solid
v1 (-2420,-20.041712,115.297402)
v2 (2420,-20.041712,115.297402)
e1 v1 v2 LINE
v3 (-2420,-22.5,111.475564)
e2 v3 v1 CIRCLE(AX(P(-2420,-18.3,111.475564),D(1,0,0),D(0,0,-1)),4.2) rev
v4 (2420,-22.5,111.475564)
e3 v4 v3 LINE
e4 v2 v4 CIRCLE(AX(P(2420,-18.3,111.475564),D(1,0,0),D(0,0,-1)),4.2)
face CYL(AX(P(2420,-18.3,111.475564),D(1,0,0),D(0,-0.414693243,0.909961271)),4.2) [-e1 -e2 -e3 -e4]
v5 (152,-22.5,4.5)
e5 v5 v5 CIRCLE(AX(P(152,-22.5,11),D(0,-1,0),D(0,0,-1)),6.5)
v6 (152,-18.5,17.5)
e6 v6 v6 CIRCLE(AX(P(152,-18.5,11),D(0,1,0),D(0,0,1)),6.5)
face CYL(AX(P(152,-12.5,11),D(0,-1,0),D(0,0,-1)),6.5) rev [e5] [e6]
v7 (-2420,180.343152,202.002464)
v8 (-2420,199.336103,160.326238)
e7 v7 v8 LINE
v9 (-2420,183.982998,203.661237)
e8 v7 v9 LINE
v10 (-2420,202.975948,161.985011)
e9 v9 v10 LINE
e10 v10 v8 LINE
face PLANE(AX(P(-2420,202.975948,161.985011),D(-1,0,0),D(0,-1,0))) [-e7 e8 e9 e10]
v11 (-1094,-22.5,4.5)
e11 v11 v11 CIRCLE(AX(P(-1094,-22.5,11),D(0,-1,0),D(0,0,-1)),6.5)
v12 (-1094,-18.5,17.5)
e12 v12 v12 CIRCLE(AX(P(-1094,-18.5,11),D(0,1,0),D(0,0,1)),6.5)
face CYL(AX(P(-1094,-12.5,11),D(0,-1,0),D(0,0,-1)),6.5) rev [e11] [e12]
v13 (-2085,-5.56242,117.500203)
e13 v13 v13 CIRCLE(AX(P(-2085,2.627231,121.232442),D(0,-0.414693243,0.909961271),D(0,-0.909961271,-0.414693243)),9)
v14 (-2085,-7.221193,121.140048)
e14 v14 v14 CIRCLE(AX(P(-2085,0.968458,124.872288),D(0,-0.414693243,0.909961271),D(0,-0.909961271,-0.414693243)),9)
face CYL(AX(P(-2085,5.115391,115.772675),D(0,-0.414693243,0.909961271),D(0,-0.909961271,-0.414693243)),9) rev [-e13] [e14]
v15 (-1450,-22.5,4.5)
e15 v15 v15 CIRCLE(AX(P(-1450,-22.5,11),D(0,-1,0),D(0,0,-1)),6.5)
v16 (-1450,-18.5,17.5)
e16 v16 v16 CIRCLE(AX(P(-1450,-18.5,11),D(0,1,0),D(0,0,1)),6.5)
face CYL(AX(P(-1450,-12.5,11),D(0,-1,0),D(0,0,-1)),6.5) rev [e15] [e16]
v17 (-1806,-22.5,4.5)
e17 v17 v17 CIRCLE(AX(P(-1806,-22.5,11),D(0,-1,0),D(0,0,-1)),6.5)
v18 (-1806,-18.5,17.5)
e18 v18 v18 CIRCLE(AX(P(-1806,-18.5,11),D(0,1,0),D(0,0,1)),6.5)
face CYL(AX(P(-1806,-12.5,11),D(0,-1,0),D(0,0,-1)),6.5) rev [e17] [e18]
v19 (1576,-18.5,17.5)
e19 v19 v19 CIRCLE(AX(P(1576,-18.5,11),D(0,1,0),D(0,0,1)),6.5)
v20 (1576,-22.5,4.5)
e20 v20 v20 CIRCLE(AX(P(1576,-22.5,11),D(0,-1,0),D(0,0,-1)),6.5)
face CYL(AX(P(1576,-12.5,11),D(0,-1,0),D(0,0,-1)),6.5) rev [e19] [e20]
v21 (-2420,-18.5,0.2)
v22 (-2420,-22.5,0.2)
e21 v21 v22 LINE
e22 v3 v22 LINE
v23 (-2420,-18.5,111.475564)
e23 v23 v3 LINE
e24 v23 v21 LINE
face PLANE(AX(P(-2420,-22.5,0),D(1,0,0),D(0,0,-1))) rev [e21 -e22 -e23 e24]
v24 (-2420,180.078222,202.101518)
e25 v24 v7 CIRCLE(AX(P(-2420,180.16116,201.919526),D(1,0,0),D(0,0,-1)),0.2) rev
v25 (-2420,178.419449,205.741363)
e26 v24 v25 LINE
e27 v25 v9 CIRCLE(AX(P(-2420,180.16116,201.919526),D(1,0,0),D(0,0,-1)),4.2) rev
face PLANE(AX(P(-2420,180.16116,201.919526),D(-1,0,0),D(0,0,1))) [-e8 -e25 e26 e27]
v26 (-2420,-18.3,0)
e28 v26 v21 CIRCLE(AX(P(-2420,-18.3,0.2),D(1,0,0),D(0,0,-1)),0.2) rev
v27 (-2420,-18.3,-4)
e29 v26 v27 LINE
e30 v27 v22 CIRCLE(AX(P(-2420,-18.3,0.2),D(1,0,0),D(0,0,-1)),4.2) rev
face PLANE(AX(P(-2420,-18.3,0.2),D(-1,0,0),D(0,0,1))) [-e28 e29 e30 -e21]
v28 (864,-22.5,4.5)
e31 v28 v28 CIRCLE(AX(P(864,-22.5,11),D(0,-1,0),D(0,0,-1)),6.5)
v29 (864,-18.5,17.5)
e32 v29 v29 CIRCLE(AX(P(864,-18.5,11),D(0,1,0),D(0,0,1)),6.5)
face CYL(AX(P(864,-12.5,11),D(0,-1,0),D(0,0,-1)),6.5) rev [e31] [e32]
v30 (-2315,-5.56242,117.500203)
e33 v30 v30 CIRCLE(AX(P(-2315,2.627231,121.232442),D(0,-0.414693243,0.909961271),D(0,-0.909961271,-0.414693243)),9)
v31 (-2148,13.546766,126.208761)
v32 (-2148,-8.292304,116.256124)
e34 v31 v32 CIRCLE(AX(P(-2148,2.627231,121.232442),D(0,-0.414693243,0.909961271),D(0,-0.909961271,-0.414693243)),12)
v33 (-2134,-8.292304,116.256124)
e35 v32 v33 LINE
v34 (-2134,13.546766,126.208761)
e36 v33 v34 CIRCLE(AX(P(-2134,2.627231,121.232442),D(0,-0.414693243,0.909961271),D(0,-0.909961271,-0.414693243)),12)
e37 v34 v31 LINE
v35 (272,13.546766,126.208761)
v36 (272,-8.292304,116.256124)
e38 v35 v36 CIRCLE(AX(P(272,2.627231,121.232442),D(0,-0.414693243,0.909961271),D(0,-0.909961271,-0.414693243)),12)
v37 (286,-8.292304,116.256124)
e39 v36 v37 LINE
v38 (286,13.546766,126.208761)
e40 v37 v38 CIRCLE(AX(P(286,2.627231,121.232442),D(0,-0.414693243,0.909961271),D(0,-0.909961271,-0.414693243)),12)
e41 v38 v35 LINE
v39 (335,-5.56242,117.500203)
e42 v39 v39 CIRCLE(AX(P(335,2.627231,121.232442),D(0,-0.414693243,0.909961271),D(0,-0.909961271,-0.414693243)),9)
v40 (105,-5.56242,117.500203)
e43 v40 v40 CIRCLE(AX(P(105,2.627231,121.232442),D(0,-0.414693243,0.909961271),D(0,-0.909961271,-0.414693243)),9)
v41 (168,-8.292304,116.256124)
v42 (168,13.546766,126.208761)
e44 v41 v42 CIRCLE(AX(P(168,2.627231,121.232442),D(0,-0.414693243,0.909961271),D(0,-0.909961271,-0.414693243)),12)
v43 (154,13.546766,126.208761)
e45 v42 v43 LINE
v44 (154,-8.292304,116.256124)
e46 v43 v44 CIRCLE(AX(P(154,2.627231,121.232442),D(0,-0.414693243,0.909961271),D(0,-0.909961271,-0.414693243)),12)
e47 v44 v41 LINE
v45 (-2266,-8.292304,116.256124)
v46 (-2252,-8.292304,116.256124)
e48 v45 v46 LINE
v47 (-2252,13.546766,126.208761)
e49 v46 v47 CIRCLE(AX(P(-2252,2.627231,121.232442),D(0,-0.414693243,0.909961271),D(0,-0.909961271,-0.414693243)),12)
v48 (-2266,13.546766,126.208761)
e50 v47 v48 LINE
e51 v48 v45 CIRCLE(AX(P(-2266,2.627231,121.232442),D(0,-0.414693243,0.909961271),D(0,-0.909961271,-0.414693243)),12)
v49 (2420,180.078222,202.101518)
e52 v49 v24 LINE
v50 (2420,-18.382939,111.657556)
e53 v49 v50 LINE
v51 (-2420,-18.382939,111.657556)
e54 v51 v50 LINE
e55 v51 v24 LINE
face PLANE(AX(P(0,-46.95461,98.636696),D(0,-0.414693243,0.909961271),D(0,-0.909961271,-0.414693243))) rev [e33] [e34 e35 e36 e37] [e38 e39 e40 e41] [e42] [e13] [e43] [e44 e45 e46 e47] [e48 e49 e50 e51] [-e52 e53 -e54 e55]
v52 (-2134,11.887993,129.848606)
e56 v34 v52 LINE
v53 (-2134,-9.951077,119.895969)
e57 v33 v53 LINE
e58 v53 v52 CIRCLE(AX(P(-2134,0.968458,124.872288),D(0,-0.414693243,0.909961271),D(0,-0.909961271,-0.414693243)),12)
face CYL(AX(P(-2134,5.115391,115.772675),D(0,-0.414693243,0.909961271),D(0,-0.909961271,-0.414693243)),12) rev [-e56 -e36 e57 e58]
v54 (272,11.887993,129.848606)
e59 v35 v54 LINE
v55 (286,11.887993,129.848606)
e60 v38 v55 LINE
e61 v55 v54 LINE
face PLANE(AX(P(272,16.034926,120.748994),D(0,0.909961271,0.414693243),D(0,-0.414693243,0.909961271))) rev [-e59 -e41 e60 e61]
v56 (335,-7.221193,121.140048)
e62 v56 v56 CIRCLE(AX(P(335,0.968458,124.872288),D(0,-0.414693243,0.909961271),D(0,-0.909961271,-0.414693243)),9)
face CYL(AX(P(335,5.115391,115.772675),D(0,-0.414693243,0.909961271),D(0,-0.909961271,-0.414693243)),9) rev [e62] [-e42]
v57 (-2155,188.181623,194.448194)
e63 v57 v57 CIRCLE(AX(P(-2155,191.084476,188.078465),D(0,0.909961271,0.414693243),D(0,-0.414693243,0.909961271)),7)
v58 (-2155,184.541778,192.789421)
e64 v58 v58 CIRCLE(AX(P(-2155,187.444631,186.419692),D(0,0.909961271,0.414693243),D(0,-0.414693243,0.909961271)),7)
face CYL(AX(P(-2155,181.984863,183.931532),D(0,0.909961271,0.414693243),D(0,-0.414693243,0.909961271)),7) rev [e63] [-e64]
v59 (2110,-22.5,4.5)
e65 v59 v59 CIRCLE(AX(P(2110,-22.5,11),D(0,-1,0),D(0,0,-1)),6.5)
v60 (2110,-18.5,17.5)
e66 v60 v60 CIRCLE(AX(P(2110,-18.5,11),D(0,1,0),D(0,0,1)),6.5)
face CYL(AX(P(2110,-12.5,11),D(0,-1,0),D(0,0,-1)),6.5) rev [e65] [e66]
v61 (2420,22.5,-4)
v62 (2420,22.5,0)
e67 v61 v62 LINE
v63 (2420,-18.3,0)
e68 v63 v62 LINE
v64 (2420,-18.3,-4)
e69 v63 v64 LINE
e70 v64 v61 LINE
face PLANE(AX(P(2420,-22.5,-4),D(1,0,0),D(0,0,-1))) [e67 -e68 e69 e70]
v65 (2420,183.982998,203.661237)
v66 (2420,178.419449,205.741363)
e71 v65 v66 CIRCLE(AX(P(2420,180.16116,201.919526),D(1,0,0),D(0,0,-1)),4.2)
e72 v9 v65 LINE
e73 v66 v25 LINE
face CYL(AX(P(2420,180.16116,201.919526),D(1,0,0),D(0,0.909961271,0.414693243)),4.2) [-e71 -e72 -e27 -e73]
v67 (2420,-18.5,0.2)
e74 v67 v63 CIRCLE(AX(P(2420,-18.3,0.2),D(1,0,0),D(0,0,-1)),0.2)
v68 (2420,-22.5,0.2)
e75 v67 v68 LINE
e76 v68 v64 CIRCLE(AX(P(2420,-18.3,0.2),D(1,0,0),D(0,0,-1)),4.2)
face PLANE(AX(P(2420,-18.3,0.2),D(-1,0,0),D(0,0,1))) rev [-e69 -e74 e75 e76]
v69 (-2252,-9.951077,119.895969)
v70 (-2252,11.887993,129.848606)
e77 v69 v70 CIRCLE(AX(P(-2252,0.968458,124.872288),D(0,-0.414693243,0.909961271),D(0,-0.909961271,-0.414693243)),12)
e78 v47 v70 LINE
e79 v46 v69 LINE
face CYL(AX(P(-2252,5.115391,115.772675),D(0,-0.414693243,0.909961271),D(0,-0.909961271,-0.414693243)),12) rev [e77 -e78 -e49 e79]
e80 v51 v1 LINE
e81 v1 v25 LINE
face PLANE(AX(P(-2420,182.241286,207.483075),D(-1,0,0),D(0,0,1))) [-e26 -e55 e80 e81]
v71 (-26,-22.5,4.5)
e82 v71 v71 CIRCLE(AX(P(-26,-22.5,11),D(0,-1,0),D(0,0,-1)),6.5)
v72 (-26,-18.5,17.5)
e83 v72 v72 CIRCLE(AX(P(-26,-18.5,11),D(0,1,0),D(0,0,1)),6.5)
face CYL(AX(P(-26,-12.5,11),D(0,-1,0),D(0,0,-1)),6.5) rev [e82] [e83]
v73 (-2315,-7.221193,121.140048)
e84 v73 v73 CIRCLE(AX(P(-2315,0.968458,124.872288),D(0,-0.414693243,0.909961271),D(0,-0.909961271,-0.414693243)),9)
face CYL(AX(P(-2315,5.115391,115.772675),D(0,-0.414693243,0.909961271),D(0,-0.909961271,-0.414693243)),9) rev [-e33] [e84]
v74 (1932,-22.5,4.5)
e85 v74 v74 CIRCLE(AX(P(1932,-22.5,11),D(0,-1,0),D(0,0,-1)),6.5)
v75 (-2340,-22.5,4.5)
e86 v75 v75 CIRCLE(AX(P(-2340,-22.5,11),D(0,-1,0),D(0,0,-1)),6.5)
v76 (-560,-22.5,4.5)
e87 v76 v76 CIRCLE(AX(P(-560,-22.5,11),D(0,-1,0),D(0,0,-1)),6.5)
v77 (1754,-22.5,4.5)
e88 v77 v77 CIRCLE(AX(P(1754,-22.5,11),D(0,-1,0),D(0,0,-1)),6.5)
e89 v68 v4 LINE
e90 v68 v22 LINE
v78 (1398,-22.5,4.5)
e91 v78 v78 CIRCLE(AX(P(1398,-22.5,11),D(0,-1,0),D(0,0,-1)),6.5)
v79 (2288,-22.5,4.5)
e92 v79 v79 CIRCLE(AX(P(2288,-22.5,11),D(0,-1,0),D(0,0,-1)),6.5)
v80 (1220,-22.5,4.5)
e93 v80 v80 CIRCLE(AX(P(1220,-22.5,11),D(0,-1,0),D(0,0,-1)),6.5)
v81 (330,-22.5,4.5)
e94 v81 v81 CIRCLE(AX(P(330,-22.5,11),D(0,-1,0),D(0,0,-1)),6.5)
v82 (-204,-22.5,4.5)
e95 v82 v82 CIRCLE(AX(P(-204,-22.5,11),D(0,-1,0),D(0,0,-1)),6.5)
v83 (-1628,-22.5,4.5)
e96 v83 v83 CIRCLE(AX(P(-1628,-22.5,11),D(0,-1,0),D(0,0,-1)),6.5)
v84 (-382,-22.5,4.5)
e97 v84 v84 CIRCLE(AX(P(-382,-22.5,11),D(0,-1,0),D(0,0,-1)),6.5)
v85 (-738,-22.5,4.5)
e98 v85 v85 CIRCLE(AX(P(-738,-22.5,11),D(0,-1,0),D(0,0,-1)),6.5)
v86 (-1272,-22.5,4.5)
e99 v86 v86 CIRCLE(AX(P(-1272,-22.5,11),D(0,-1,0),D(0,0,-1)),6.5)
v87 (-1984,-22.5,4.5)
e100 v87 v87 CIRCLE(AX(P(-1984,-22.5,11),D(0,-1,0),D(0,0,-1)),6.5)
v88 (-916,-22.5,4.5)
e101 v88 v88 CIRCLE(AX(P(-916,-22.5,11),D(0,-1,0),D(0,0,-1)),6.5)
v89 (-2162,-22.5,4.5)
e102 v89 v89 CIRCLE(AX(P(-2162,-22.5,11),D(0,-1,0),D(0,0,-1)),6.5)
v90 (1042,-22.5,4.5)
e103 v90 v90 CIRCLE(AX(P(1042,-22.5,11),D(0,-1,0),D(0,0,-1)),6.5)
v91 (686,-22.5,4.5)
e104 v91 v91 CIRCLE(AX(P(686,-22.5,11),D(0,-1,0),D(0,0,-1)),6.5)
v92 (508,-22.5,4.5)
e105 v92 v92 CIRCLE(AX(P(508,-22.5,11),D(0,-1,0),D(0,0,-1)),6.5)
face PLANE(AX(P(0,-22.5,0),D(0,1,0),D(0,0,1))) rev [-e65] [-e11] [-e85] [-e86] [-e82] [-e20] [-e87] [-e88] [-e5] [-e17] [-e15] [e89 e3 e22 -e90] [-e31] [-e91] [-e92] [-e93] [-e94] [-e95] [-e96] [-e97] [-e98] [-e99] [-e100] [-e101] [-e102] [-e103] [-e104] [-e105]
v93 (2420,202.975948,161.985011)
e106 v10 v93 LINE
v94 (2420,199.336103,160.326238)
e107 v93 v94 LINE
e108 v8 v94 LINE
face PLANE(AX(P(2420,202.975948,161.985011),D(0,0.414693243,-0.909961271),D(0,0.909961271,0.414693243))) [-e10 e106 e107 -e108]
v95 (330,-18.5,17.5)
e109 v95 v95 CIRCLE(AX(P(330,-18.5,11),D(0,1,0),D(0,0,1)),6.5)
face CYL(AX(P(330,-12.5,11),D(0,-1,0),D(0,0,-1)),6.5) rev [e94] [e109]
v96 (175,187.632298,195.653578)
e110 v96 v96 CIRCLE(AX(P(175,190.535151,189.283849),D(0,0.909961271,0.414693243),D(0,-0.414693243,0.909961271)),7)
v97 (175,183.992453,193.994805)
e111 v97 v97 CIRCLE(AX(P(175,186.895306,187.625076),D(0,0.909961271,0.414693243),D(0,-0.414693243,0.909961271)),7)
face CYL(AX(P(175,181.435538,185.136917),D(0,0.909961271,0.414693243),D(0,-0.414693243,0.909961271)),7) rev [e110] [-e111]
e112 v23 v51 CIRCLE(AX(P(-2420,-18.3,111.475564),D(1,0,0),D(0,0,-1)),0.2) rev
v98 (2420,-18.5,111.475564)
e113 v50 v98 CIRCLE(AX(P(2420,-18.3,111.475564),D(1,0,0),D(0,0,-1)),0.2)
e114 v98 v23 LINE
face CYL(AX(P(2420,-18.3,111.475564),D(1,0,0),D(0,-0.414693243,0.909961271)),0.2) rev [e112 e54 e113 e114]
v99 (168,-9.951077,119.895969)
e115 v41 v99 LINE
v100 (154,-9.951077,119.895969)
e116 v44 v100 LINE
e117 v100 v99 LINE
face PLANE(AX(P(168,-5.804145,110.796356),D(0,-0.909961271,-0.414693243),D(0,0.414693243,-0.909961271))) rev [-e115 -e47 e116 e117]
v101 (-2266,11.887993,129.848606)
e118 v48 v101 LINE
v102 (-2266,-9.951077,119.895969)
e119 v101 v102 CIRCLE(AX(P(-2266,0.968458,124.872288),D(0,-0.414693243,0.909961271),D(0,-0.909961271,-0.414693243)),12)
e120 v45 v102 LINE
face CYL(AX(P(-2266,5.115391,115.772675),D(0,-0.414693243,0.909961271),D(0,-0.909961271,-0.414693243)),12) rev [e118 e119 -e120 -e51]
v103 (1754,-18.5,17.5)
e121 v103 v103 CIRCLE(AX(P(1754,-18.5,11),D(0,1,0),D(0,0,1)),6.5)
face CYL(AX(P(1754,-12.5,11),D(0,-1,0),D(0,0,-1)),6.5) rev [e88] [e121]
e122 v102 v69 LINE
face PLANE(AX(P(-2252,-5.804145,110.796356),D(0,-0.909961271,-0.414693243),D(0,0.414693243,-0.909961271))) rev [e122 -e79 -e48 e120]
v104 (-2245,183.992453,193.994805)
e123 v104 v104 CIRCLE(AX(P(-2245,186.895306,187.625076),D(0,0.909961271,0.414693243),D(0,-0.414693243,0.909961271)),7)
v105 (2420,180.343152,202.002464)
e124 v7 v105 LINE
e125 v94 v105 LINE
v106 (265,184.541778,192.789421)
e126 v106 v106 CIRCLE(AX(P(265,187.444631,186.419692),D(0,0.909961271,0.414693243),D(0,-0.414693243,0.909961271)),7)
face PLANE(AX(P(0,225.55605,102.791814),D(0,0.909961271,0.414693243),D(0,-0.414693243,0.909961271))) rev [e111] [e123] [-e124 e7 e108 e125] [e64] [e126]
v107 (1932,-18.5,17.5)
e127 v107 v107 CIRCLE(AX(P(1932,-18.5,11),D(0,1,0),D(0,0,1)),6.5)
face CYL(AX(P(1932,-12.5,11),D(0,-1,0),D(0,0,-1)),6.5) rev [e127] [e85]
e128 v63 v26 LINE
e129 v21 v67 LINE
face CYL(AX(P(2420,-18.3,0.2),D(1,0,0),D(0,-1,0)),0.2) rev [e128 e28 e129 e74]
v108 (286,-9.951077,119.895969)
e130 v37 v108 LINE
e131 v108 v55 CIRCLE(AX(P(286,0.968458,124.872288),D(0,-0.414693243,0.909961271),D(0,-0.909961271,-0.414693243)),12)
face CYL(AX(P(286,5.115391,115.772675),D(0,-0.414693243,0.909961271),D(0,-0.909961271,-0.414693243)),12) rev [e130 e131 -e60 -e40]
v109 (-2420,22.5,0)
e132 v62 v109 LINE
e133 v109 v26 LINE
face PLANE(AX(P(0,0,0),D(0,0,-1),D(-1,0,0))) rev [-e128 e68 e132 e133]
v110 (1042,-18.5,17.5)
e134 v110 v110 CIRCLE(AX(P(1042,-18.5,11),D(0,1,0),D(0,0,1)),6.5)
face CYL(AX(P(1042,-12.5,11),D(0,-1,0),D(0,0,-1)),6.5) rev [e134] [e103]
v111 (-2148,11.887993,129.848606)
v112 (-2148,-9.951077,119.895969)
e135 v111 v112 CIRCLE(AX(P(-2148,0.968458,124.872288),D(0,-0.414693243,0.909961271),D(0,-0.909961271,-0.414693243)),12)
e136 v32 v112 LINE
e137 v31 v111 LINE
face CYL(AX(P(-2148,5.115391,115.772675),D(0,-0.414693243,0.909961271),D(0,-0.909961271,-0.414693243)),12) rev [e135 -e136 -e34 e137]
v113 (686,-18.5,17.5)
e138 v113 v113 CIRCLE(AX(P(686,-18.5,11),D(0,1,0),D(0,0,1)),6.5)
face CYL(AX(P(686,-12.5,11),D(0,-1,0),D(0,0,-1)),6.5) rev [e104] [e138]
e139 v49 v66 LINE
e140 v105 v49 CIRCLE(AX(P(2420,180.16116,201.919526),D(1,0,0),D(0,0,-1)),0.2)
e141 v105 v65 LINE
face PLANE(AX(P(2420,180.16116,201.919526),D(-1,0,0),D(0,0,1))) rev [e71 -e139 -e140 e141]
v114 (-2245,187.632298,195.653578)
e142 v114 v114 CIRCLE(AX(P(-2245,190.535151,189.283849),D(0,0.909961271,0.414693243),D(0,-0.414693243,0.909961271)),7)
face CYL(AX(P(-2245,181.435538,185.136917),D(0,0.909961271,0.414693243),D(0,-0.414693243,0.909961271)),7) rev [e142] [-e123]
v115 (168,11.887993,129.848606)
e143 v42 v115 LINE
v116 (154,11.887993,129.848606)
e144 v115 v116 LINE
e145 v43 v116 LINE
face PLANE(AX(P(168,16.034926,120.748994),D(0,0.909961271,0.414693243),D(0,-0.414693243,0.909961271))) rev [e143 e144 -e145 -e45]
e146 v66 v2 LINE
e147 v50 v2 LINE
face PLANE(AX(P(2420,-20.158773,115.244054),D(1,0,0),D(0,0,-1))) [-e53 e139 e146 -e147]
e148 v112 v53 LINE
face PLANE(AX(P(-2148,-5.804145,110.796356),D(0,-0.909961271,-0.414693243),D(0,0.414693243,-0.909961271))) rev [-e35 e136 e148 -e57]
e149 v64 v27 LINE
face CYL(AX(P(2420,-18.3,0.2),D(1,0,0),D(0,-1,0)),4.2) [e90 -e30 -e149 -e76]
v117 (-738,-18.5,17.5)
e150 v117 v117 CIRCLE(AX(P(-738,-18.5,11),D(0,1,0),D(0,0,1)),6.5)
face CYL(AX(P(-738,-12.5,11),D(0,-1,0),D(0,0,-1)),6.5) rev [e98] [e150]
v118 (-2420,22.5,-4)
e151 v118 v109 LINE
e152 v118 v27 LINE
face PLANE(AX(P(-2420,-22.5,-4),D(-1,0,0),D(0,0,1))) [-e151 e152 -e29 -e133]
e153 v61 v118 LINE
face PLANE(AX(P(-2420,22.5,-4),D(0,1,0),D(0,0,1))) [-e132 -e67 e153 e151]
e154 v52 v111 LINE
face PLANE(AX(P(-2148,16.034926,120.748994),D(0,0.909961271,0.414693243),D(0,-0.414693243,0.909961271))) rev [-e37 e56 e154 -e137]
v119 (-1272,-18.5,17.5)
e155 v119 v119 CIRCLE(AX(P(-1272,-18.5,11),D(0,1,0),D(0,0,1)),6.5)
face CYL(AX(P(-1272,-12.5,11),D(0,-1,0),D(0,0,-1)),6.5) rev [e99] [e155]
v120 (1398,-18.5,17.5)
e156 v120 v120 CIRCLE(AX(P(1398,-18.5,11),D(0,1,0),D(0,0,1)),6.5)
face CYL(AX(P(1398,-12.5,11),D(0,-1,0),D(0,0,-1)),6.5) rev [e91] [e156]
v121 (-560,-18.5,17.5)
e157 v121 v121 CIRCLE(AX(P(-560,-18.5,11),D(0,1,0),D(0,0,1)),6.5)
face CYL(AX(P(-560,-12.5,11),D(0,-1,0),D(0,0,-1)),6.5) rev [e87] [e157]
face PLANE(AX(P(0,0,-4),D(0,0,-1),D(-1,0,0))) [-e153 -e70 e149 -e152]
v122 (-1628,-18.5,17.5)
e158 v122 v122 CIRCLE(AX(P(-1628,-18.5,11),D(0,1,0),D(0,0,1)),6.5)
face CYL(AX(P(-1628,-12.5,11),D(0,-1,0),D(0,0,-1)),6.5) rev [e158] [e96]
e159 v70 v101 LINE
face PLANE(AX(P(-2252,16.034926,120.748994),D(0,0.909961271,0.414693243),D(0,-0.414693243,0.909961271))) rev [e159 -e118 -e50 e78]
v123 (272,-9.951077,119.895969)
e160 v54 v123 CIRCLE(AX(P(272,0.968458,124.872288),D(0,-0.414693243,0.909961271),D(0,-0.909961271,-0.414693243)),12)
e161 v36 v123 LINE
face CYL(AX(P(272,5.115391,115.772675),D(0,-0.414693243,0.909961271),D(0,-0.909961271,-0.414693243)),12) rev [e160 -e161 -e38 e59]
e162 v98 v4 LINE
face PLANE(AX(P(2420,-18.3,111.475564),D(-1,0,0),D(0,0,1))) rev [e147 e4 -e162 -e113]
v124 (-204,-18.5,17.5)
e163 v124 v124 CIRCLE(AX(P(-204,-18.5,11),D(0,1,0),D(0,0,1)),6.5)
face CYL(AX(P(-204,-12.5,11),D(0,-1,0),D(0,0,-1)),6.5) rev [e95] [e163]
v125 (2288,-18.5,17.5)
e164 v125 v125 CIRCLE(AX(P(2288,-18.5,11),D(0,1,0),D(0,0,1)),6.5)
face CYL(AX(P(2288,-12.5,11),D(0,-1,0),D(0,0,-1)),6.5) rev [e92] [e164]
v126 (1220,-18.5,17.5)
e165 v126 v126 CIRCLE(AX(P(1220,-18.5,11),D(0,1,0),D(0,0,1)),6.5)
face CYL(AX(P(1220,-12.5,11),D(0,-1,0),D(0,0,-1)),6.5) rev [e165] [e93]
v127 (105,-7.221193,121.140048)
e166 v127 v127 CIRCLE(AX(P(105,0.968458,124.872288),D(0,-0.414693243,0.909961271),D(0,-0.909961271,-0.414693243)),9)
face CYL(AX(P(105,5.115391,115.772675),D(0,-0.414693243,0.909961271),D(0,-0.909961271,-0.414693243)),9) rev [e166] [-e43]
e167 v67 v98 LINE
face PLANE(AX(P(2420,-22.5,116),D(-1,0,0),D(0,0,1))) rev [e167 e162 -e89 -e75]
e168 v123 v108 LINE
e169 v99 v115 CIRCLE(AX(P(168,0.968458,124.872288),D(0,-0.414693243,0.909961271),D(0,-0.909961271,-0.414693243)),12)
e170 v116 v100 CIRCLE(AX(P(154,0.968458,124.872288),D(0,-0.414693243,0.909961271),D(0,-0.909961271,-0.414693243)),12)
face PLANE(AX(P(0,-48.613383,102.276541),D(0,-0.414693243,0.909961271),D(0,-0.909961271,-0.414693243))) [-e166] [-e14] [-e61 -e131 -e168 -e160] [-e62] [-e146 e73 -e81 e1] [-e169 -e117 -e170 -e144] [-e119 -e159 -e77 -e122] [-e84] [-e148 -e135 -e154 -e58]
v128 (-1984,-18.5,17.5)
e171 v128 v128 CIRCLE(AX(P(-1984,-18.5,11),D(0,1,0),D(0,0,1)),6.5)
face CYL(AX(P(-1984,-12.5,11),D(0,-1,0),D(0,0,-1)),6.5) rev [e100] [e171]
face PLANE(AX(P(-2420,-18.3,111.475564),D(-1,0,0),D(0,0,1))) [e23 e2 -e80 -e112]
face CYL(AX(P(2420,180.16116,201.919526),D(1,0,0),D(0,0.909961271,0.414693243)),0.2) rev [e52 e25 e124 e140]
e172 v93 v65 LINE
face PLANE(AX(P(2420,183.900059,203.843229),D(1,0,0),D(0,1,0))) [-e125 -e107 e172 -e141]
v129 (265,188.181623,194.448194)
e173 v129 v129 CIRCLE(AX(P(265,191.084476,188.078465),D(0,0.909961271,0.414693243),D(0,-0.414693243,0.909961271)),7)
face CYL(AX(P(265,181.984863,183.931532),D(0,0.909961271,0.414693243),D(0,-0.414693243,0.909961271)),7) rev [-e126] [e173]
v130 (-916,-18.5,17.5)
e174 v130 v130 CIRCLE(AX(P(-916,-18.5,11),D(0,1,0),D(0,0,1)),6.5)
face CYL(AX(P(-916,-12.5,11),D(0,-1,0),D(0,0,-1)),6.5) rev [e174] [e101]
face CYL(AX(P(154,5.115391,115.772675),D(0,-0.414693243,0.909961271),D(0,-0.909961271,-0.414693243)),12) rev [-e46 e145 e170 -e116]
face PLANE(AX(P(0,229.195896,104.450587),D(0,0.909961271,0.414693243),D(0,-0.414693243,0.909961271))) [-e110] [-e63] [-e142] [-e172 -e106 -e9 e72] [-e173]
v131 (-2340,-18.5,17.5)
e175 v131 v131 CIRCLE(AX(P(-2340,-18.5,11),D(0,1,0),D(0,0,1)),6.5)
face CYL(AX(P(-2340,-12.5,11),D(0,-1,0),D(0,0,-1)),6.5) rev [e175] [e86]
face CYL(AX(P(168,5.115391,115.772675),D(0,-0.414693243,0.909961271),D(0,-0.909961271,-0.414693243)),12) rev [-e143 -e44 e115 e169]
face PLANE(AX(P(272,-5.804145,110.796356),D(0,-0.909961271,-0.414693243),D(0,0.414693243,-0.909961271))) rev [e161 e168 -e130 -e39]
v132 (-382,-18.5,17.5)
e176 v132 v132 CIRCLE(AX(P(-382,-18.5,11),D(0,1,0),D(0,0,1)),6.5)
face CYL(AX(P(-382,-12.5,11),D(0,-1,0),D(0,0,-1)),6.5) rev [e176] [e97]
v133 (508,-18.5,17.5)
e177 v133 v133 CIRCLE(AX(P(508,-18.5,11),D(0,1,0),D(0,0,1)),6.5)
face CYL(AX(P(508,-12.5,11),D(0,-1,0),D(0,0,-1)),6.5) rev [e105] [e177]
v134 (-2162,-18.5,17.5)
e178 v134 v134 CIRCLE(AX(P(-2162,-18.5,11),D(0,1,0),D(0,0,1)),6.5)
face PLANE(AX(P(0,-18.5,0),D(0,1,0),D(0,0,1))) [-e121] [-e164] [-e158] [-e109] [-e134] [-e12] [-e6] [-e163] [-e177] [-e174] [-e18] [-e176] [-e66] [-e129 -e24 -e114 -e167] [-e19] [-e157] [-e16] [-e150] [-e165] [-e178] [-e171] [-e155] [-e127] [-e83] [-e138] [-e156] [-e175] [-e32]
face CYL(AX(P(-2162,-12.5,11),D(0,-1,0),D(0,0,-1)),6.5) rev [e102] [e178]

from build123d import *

# Parameters (mm, degrees)
SKETCH1_W                    = 4840
SKETCH1_H                    = 45
BASE_FLANGE1_DEPTH           = 4
EDGE_FLANGE1_STRIP_W         = 16.4
EDGE_FLANGE1_STRIP_H         = 4
EDGE_FLANGE1_STRIP_CUT_DEPTH = 4840
EDGE_FLANGE1_DEPTH           = 4840
EDGE_FLANGE2_START           = -2420
EDGE_FLANGE2_DEPTH           = 4840
EDGE_FLANGE2_2_DEPTH         = 4840
EDGE_FLANGE3_STRIP_W         = 16.4
EDGE_FLANGE3_STRIP_H         = 4
EDGE_FLANGE3_STRIP_CUT_DEPTH = 4840
EDGE_FLANGE3_DEPTH           = 4840
SKETCH15_R                   = 7
CUT_EXTRUDE1_DEPTH           = 10
SKETCH17_R                   = 6.5
CUT_EXTRUDE3_DEPTH           = 10
LPATTERN1_COUNT              = 27
LPATTERN1_PITCH              = 178
SKETCH18_R                   = 9
CUT_EXTRUDE4_DEPTH           = 10
LPATTERN2_COUNT              = 2
LPATTERN2_PITCH              = 2420
LPATTERN3_COUNT              = 2
LPATTERN3_PITCH              = 2420


# Read off the part's stored shape, not the designer's step: Edge-Flange2
# Sheet-metal steps are written as plain solids
with BuildPart() as part:
    # Sketch1 → Base-Flange1 (new body)
    with BuildSketch(Plane.XY):
        Rectangle(SKETCH1_W, SKETCH1_H)
    extrude(amount=-BASE_FLANGE1_DEPTH)

    # Edge-Flange1 strip (across the edge) → Edge-Flange1 strip cut (cut)
    with BuildSketch(Plane(origin=(-2420, -22.5, 0), x_dir=(0, 1, 0), z_dir=(1, 0, 0))):
        with Locations((-4, -2)):
            Rectangle(EDGE_FLANGE1_STRIP_W, EDGE_FLANGE1_STRIP_H)
    extrude(amount=EDGE_FLANGE1_STRIP_CUT_DEPTH, mode=Mode.SUBTRACT)

    # Edge-Flange1 section (across the edge) → Edge-Flange1 (add)
    with BuildSketch(Plane(origin=(-2420, -22.5, 0), x_dir=(0, 1, 0), z_dir=(1, 0, 0))):
        with BuildLine():
            Line((0, 0.2), (0, 116))
            Line((0, 116), (4, 116))
            Line((4, 116), (4, 0.2))
            ThreePointArc((4, 0.2), (4.058578644, 0.058578644), (4.2, 0))
            Line((4.2, 0), (4.2, -4))
            ThreePointArc((4.2, -4), (1.230151519, -2.769848481), (0, 0.2))
        make_face()
    extrude(amount=EDGE_FLANGE1_DEPTH)

    # Edge-Flange2 outline → Edge-Flange2 (cut)
    with BuildSketch(Plane.YZ.offset(EDGE_FLANGE2_START)):
        with BuildLine():
            ThreePointArc((-22.5, 111.475564199), (-21.832363854, 113.747656979), (-20.041711619, 115.297401537))
            Line((-20.041711619, 115.297401537), (-18.5, 116))
            Line((-18.5, 116), (-22.5, 116))
            Line((-22.5, 116), (-22.5, 111.475564199))
        make_face()
    extrude(amount=EDGE_FLANGE2_DEPTH, mode=Mode.SUBTRACT)

    # Edge-Flange2 2 outline → Edge-Flange2 2 (add)
    with BuildSketch(Plane.YZ.offset(EDGE_FLANGE2_START)):
        with BuildLine():
            Line((182.241285947, 207.483074576), (-18.5, 116))
            Line((-18.5, 116), (-18.5, 111.475564199))
            ThreePointArc((-18.5, 111.475564199), (-18.468207803, 111.583759093), (-18.382938649, 111.657556453))
            Line((-18.382938649, 111.657556453), (183.900058918, 203.843229492))
            Line((183.900058918, 203.843229492), (182.241285947, 207.483074576))
        make_face()
    extrude(amount=EDGE_FLANGE2_2_DEPTH)

    # Edge-Flange3 strip (across the edge) → Edge-Flange3 strip cut (cut)
    with BuildSketch(Plane(origin=(-2420, 183.900058918, 203.843229492), x_dir=(0, -0.9099612708765384, -0.41469324265624946), z_dir=(1, 0, 0))):
        with Locations((-4, -2)):
            Rectangle(EDGE_FLANGE3_STRIP_W, EDGE_FLANGE3_STRIP_H)
    extrude(amount=EDGE_FLANGE3_STRIP_CUT_DEPTH, mode=Mode.SUBTRACT)

    # Edge-Flange3 section (across the edge) → Edge-Flange3 (add)
    with BuildSketch(Plane(origin=(-2420, 183.900058918, 203.843229492), x_dir=(0, -0.9099612708765384, -0.41469324265624946), z_dir=(1, 0, 0))):
        with BuildLine():
            Line((0, 0.2), (0, 46))
            Line((0, 46), (4, 46))
            Line((4, 46), (4, 0.2))
            ThreePointArc((4, 0.2), (4.058578644, 0.058578644), (4.2, 0))
            Line((4.2, 0), (4.2, -4))
            ThreePointArc((4.2, -4), (1.230151519, -2.769848481), (0, 0.2))
        make_face()
    extrude(amount=EDGE_FLANGE3_DEPTH)

    # Sketch15 → Cut-Extrude1 (cut)
    with BuildSketch(Plane(origin=(0, 229.195895582, 104.450587277), x_dir=(1, 0, 0), z_dir=(0, 0.9099612708765382, 0.4146932426562498))):
        with Locations(Location((175, -93.227332411, 0), (0, 0, 270))):
            Circle(SKETCH15_R)
        with Locations(Location((265, -91.902677897, 0), (0, 0, 270))):
            Circle(SKETCH15_R)
    cut_extrude1 = extrude(amount=-CUT_EXTRUDE1_DEPTH, mode=Mode.SUBTRACT)

    # Sketch17 → Cut-Extrude3 (cut)
    with BuildSketch(Plane.XZ.offset(22.5)):
        with Locations(Location((2288, 11, 0), (0, 0, 270))):
            Circle(SKETCH17_R)
    cut_extrude3 = extrude(amount=-CUT_EXTRUDE3_DEPTH, mode=Mode.SUBTRACT)

    # LPattern1: Cut-Extrude3 ×27
    with Locations(*[(-i * LPATTERN1_PITCH, 0, 0) for i in range(1, LPATTERN1_COUNT)]):
        add(cut_extrude3, mode=Mode.SUBTRACT)

    # Sketch18 → Cut-Extrude4 (cut)
    with BuildSketch(Plane(origin=(0, -46.954609635, 103.032487299), x_dir=(1, 0, 0), z_dir=(0, -0.4146932426562464, 0.90996127087654))):
        with Locations(Location((335, 52.664953269, 0), (0, 0, 270))):
            Circle(SKETCH18_R)
        with Locations(Location((105, 52.664953269, 0), (0, 0, 270))):
            Circle(SKETCH18_R)
        with BuildLine():
            Line((168, 40.664953269), (154, 40.664953269))
            ThreePointArc((154, 40.664953269), (142, 52.664953269), (154, 64.664953269))
            Line((154, 64.664953269), (168, 64.664953269))
            ThreePointArc((168, 64.664953269), (180, 52.664953269), (168, 40.664953269))
        make_face()
        with BuildLine():
            Line((272, 64.664953269), (286, 64.664953269))
            ThreePointArc((286, 64.664953269), (298, 52.664953269), (286, 40.664953269))
            Line((286, 40.664953269), (272, 40.664953269))
            ThreePointArc((272, 40.664953269), (260, 52.664953269), (272, 64.664953269))
        make_face()
    cut_extrude4 = extrude(amount=-CUT_EXTRUDE4_DEPTH, mode=Mode.SUBTRACT)

    # LPattern2: Cut-Extrude1 ×2
    with Locations(*[(-i * LPATTERN2_PITCH, 0, 0) for i in range(1, LPATTERN2_COUNT)]):
        add(cut_extrude1, mode=Mode.SUBTRACT)

    # LPattern3: Cut-Extrude4 ×2
    with Locations(*[(-i * LPATTERN3_PITCH, 0, 0) for i in range(1, LPATTERN3_COUNT)]):
        add(cut_extrude4, mode=Mode.SUBTRACT)


solid = part.part
